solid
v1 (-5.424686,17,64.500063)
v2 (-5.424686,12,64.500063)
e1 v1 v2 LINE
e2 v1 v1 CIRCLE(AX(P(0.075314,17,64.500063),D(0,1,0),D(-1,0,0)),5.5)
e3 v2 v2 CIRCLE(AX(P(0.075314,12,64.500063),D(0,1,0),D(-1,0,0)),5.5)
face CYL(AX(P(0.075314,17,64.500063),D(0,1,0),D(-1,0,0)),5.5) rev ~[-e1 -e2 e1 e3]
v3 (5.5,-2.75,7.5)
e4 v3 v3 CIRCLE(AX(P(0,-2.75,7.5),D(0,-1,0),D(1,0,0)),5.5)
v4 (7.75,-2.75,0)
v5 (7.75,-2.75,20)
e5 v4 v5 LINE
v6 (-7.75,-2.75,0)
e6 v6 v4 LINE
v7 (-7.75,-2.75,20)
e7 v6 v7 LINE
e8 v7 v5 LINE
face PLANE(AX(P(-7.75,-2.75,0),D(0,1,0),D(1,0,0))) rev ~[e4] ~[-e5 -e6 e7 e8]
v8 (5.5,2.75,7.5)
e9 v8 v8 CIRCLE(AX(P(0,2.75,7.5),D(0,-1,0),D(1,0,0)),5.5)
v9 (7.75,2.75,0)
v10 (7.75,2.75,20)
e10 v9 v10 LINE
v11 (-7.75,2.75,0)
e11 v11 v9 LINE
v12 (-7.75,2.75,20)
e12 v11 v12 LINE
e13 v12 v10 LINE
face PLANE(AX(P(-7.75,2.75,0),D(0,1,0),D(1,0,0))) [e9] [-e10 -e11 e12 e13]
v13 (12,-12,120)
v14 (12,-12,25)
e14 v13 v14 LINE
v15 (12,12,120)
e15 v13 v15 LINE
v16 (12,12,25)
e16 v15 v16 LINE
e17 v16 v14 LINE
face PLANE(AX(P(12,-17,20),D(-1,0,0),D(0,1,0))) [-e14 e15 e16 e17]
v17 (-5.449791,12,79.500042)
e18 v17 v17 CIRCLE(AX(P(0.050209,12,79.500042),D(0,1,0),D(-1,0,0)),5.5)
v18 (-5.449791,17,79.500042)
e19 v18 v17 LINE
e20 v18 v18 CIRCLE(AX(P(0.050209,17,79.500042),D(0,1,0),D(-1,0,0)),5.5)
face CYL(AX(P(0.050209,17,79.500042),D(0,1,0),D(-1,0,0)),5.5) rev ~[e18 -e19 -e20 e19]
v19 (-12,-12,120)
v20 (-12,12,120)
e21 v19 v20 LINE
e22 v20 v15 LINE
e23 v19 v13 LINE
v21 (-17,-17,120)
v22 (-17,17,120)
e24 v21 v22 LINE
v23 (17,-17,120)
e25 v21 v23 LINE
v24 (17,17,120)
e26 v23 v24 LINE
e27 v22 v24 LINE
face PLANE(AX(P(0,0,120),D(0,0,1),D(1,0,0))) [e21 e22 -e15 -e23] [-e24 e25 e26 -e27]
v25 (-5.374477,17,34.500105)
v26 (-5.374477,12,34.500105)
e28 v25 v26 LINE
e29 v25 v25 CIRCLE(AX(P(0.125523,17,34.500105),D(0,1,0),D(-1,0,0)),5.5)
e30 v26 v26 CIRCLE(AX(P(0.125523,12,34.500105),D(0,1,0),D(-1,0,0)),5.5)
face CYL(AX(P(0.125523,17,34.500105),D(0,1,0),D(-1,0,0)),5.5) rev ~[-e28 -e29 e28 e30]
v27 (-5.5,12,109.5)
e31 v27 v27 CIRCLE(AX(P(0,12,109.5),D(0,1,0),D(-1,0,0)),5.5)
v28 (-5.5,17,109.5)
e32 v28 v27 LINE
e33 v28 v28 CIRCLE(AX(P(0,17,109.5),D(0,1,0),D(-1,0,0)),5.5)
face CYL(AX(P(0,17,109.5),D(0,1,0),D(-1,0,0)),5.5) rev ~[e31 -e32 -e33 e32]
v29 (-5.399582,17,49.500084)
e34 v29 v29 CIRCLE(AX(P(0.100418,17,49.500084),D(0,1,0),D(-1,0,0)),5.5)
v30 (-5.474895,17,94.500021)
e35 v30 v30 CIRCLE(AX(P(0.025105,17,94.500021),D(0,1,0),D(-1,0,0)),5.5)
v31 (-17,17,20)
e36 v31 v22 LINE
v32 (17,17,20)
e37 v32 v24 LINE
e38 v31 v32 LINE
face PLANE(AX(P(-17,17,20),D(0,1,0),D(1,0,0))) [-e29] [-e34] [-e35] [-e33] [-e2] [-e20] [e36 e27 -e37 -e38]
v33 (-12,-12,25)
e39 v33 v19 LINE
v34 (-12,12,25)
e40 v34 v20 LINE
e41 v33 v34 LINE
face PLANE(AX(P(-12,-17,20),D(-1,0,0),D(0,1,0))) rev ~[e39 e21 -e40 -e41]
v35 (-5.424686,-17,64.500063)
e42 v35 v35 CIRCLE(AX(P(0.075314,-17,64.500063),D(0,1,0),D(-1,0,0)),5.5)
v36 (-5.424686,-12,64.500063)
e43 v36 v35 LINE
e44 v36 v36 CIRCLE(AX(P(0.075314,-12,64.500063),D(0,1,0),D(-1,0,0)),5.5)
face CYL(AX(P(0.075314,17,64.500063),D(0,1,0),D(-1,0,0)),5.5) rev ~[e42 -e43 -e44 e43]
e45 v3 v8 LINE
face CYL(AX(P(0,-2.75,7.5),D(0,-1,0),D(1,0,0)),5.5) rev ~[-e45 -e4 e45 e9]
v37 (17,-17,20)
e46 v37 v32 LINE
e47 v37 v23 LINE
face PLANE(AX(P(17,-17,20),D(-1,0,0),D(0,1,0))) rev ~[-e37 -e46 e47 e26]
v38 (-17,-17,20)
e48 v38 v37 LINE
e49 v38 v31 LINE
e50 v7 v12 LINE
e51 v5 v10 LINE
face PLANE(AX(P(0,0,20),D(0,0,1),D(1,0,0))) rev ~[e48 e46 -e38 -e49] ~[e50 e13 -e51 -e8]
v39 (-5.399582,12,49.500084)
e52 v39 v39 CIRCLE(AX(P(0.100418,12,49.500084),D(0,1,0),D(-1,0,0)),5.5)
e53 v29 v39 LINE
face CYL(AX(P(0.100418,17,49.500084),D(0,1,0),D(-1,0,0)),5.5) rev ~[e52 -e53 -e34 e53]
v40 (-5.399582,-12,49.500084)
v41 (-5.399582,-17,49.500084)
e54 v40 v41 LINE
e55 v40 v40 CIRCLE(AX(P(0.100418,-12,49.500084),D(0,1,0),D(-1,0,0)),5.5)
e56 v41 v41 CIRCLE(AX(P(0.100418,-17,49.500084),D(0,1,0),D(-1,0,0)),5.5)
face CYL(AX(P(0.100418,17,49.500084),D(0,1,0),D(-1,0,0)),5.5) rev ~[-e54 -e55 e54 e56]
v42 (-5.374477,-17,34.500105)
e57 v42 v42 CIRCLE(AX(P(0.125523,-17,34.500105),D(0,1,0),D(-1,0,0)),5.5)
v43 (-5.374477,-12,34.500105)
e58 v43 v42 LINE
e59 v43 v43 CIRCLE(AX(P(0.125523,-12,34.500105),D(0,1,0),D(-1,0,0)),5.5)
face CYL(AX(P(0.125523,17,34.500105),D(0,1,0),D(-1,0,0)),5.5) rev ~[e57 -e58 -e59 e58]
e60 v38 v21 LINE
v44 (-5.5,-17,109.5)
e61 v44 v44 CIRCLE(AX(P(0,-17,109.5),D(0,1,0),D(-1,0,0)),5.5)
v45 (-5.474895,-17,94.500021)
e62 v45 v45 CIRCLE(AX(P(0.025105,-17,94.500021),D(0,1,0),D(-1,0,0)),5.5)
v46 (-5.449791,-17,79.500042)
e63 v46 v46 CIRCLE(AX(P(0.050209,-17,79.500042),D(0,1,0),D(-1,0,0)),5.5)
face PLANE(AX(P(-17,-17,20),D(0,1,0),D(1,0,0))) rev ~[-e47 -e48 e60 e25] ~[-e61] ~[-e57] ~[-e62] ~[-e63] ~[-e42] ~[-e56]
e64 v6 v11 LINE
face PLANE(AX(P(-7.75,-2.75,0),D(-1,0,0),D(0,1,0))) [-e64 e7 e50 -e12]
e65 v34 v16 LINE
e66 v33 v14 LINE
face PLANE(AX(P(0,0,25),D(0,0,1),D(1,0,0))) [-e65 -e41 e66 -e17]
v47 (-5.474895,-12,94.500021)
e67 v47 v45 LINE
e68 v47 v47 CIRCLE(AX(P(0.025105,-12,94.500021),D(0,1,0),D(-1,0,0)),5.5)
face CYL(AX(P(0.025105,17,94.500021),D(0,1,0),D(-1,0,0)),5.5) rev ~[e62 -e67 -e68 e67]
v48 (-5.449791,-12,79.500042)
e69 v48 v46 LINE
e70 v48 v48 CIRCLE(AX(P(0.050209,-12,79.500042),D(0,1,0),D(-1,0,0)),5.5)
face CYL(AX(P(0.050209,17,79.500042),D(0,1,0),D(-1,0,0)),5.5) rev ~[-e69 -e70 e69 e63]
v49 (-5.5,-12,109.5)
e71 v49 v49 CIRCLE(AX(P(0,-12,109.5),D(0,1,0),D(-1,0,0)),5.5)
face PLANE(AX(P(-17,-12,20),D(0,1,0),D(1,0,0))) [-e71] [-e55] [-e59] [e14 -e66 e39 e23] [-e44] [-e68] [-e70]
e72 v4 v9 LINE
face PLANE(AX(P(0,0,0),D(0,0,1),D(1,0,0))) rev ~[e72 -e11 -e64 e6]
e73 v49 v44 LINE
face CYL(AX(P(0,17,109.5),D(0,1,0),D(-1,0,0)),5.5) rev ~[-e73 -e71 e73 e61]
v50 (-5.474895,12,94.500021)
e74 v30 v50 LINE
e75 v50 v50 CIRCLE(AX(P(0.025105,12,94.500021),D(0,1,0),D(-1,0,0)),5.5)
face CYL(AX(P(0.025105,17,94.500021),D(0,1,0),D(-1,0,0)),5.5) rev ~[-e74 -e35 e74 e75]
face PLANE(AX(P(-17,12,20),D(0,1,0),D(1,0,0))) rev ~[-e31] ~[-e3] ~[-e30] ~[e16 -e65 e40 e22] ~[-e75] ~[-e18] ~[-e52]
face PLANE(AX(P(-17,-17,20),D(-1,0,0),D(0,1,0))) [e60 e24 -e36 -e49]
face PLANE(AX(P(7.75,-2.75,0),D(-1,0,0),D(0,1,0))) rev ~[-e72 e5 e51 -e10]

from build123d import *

# Parameters (mm, degrees)
F0_W        = 15.5
F0_H        = 5.5
F1_DEPTH    = 20
F2_R        = 5.5
F3_DEPTH    = 5.5
F4_W        = 34
F4_H        = 34
F4_W_2      = 15.5
F4_H_2      = 5.5
F5_DEPTH    = 100
F6_T        = 5
F6_T3_DEPTH = 15.5
F6_T5_DEPTH = 25.5
F7_R        = 5.5
F8_DEPTH    = 34


# Not quite as in the source:
# - a shell that OpenCascade refuses in one call is made with other operations: the cavity is built on its own and cut out


with BuildPart() as f1:
    # F0 (on Top) → F1 (new body)
    with BuildSketch(Plane.XY):
        Rectangle(F0_W, F0_H)
    extrude(amount=F1_DEPTH)

    # F2 (on face) → F3 (cut, through all)
    with BuildSketch(Plane.XZ.offset(2.75)):
        with Locations((0, 7.5)):
            Circle(F2_R)
    extrude(amount=-F3_DEPTH, mode=Mode.SUBTRACT)

    # F4 (on face) → F5 (join)
    with BuildSketch(Plane.XY.offset(20)):
        Rectangle(F4_W, F4_H)
        Rectangle(F4_W_2, F4_H_2, mode=Mode.SUBTRACT)
        Rectangle(F4_W_2, F4_H_2)
    extrude(amount=F5_DEPTH)

    # F6: shell of thickness 5, made by hand


with BuildPart() as f6_core1:
    # F6_t2: copy of F1
    add(f1.part)

    # the walls: a layer under each face that stays
    f6_faces = [f6_core1.faces().sort_by_distance(p)[0] for p in [
        (17, 0, 70),
        (0, -17, 70),
        (0, 17, 70),
        (-11.3333333333, -11.3333333333, 20),
        (-17, 0, 70),
        (7.75, 0, 10),
        (5.1666666667, 2.75, 16.6666666667),
        (-7.75, 0, 10),
        (-5.1666666667, -2.75, 16.6666666667),
        (0, 0, 0),
        (-5.5, 0, 7.5),
    ]]
    thicken(f6_faces, amount=-F6_T, mode=Mode.SUBTRACT)

    # F6_s4 → F6_t3 (cut)
    with BuildSketch(Plane.XZ.offset(-7.75)):
        Polygon((7.8, 19.95), (7.75, 25), (2.75, 25), (2.75, 20), align=None)
        Polygon((-7.8, 19.95), (-7.75, 25), (-2.75, 25), (-2.75, 20), align=None)
    extrude(amount=F6_T3_DEPTH, mode=Mode.SUBTRACT)

    # F6_s6 → F6_t5 (cut)
    with BuildSketch(Plane.YZ.offset(-12.75)):
        Polygon((2.8, 19.95), (2.75, 25), (-2.25, 25), (-2.25, 20), align=None)
        Polygon((-2.8, 19.95), (-2.75, 25), (2.25, 25), (2.25, 20), align=None)
    extrude(amount=F6_T5_DEPTH, mode=Mode.SUBTRACT)


with BuildPart() as f1_1:
    add(f1.part)

    # what is left inside the walls is the cavity
    f6_cavity = [f6_core1.part.solids().sort_by_distance(p)[0] for p in [
        (11.95, 0, 88.333333),
    ]]
    add(f6_cavity, mode=Mode.SUBTRACT)

    # F7 (on face) → F8 (cut, through all)
    with BuildSketch(Plane(origin=(0, 17, 0), x_dir=(-1, 0, 0), z_dir=(0, 1, 0))):
        with Locations((0, 109.5)):
            Circle(F7_R)
        with Locations((-0.0251045674, 94.500021008)):
            Circle(F7_R)
        with Locations((-0.0502091347, 79.500042016)):
            Circle(F7_R)
        with Locations((-0.0753137021, 64.500063024)):
            Circle(F7_R)
        with Locations((-0.1004182694, 49.500084032)):
            Circle(F7_R)
        with Locations((-0.1255228368, 34.50010504)):
            Circle(F7_R)
    extrude(amount=-F8_DEPTH, mode=Mode.SUBTRACT)


solid = f1_1.part
